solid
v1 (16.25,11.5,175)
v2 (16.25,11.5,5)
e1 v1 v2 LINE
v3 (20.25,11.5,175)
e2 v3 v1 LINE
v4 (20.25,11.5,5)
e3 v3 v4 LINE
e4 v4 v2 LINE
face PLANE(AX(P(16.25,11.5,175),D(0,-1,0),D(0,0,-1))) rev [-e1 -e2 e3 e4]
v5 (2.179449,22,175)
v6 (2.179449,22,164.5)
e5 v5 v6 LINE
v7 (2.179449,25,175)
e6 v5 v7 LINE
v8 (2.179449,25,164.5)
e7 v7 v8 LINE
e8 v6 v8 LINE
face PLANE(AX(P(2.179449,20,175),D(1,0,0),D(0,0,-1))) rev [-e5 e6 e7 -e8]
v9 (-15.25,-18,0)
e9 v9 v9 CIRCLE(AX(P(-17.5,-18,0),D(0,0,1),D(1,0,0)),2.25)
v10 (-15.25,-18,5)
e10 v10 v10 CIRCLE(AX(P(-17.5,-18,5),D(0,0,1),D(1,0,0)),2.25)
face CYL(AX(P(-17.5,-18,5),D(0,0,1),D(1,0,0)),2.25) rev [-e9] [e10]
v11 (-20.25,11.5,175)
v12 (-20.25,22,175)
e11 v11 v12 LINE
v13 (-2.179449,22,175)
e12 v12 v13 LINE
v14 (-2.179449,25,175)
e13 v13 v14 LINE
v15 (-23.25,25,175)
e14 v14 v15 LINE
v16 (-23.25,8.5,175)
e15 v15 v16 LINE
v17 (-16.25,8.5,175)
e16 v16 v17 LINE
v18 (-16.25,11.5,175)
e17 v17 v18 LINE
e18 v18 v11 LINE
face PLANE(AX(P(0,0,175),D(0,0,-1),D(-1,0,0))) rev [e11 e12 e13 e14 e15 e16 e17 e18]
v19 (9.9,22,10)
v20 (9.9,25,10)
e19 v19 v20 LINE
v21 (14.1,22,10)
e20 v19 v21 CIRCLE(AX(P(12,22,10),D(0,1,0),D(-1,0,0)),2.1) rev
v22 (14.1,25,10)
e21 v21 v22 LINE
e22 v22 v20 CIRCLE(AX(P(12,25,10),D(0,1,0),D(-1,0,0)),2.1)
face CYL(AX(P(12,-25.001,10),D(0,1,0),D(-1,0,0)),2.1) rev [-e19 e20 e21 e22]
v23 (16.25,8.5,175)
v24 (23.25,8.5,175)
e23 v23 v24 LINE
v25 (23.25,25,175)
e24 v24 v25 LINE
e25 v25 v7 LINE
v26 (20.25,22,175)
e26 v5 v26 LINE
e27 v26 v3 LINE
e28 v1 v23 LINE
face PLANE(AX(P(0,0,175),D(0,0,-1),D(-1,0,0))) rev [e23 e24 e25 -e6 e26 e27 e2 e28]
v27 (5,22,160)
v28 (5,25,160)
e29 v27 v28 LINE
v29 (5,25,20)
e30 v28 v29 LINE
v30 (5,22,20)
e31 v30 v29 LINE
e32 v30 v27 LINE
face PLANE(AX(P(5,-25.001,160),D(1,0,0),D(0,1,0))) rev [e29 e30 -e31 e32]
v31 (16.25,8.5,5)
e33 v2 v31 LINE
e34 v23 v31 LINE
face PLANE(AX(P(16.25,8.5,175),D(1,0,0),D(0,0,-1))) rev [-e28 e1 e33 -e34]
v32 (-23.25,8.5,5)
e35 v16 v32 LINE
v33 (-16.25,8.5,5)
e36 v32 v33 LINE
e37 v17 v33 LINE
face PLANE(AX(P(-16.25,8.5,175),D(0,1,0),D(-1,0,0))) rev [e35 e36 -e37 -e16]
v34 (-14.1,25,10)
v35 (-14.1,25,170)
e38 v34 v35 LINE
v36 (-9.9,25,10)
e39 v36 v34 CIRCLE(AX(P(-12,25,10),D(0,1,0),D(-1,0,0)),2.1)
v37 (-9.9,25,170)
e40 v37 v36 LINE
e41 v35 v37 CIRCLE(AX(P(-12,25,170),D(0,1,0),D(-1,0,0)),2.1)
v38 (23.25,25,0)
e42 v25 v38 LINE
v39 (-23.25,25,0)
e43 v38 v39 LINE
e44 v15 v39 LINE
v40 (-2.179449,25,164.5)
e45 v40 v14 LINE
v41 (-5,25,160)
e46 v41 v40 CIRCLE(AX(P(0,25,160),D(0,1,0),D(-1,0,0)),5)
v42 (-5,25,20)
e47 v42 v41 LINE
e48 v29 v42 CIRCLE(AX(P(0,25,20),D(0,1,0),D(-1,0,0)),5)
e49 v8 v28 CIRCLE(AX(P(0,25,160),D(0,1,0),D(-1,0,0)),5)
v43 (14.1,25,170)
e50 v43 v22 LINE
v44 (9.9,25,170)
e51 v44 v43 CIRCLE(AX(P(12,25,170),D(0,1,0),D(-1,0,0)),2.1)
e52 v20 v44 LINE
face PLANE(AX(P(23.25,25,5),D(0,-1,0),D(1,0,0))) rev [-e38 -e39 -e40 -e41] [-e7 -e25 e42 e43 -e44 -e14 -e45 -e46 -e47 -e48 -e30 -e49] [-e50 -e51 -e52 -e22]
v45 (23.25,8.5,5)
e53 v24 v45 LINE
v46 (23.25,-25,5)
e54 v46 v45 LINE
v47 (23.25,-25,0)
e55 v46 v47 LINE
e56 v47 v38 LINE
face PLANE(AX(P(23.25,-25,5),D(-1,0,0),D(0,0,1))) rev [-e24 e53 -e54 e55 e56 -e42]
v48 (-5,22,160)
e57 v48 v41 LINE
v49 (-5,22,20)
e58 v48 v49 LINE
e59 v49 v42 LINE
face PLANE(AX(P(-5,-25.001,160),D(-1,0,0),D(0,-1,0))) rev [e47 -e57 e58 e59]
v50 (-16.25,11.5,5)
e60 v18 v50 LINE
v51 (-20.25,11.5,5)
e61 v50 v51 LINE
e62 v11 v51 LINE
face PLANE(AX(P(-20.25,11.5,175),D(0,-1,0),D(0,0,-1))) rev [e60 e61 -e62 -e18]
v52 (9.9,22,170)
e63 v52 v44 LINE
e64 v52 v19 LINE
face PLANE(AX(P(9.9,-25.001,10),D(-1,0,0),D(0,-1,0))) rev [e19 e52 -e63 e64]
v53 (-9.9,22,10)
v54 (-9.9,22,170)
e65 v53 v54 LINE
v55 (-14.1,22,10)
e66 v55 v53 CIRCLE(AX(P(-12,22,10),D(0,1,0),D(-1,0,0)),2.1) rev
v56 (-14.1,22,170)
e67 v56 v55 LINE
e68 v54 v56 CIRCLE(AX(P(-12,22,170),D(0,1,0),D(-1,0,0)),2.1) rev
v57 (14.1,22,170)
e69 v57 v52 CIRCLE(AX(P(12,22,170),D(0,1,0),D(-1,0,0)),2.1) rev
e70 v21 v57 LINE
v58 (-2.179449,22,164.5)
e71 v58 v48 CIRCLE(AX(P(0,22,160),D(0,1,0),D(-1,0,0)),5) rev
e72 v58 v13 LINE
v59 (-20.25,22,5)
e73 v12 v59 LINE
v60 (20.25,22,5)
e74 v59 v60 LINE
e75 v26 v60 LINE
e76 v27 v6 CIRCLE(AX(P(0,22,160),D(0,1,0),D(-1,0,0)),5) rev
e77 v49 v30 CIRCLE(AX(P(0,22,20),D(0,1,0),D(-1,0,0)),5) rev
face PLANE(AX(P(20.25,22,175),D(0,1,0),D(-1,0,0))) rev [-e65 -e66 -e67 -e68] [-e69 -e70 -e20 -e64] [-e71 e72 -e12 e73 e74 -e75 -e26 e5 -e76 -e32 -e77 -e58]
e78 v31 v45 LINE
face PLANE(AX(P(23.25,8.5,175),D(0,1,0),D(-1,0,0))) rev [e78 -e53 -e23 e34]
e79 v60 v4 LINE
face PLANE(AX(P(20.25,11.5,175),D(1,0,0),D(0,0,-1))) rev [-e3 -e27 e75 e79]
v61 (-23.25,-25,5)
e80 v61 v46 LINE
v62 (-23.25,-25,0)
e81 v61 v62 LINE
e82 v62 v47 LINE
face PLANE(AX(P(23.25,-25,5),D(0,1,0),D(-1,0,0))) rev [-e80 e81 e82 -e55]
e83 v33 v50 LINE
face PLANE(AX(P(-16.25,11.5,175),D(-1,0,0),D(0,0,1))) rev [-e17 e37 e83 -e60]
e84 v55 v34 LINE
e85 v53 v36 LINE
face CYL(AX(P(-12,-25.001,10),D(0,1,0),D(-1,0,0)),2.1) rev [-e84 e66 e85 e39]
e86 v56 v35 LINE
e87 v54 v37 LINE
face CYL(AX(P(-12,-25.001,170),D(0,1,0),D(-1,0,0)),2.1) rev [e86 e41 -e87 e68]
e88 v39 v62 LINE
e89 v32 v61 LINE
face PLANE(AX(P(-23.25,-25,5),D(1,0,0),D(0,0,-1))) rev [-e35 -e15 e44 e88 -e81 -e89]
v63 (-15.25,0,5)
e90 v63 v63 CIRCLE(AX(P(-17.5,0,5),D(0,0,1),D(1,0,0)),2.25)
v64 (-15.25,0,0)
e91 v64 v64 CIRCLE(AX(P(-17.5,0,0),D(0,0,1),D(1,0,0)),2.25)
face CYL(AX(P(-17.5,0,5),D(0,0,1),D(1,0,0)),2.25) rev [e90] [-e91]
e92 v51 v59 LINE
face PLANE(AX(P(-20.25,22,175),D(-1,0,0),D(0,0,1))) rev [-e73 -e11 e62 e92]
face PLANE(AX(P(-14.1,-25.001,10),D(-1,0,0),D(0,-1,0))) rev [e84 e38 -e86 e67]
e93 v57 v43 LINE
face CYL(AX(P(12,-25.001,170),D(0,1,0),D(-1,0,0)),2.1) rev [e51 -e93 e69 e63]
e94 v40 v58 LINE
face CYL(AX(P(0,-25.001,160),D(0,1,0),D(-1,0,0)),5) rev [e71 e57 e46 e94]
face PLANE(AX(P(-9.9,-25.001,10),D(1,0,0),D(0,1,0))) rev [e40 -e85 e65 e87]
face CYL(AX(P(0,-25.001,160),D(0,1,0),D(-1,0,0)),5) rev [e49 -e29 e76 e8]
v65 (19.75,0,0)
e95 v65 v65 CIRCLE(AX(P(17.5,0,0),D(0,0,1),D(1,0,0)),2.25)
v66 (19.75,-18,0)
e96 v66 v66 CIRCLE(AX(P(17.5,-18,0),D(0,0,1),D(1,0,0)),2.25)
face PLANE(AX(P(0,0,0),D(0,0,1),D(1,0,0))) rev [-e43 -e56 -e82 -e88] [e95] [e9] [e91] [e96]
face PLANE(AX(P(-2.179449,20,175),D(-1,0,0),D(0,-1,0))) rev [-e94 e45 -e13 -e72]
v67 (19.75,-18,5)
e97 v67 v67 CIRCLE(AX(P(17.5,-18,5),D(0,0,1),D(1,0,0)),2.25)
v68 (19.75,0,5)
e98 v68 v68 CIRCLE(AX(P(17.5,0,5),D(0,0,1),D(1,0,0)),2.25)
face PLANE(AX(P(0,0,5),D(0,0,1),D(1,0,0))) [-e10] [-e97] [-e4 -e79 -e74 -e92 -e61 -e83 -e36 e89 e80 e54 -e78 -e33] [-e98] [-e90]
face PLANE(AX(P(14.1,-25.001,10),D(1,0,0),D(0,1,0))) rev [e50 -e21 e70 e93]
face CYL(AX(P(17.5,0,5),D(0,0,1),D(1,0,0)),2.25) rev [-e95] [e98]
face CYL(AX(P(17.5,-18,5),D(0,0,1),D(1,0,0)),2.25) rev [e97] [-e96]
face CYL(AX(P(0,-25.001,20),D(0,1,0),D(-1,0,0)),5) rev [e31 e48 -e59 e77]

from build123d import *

# Parameters (mm, degrees)
ESQUISSE1_W              = 46.5
ESQUISSE1_H              = 50
BOSS_EXTRU_1_DEPTH       = 5
BOSS_EXTRU_2_DEPTH       = 170
D_GAGEMENT_M41_OUTLINE_R = 2.25
D_GAGEMENT_M41_DEPTH     = 5
ENL_V_MAT_EXTRU_3_REACH  = 185.482
ESQUISSE8_W              = 4.358898944
ESQUISSE8_H              = 10.5
ENL_V_MAT_EXTRU_4_DEPTH  = 5


# Read off the part's stored shape, not the designer's step: Dégagement M41
with BuildPart() as part:
    # Esquisse1 → Boss.-Extru.1 (new body)
    with BuildSketch(Plane.XY):
        Rectangle(ESQUISSE1_W, ESQUISSE1_H)
    extrude(amount=BOSS_EXTRU_1_DEPTH)

    # Esquisse2 → Boss.-Extru.2 (add)
    with BuildSketch(Plane.XY.offset(5)):
        Polygon((-23.25, 25), (23.25, 25), (23.25, 8.5), (16.25, 8.5), (16.25, 11.5), (20.25, 11.5), (20.25, 22), (-20.25, 22), (-20.25, 11.5), (-16.25, 11.5), (-16.25, 8.5), (-23.25, 8.5), align=None)
    extrude(amount=BOSS_EXTRU_2_DEPTH)

    # Dégagement M41 outline → Dégagement M41 (cut)
    with BuildSketch(Plane.XY):
        with Locations((17.5, -18)):
            Circle(D_GAGEMENT_M41_OUTLINE_R)
        with Locations((-17.5, 0)):
            Circle(D_GAGEMENT_M41_OUTLINE_R)
        with Locations((17.5, 0)):
            Circle(D_GAGEMENT_M41_OUTLINE_R)
        with Locations((-17.5, -18)):
            Circle(D_GAGEMENT_M41_OUTLINE_R)
    extrude(amount=D_GAGEMENT_M41_DEPTH, mode=Mode.SUBTRACT)

    # Esquisse5 → Enlèv. mat.-Extru.3 (cut, up to next)
    with BuildSketch(Plane(origin=(0, 25, 0), x_dir=(1, 0, 0), z_dir=(0, 1, 0)), mode=Mode.PRIVATE) as enl_v_mat_extru_3_sk1:
        with BuildLine():
            Line((14.1, -10), (14.1, -170))
            ThreePointArc((14.1, -170), (12, -172.1), (9.9, -170))
            Line((9.9, -170), (9.9, -10))
            ThreePointArc((9.9, -10), (12, -7.9), (14.1, -10))
        make_face()
    enl_v_mat_extru_3_tool1 = extrude(enl_v_mat_extru_3_sk1.sketch, amount=-ENL_V_MAT_EXTRU_3_REACH, mode=Mode.PRIVATE) & part.part
    # Esquisse5 → Enlèv. mat.-Extru.3 (cut, up to next)
    with BuildSketch(Plane(origin=(0, 25, 0), x_dir=(1, 0, 0), z_dir=(0, 1, 0)), mode=Mode.PRIVATE) as enl_v_mat_extru_3_sk2:
        with BuildLine():
            Line((-9.9, -10), (-9.9, -170))
            ThreePointArc((-9.9, -170), (-12, -172.1), (-14.1, -170))
            Line((-14.1, -170), (-14.1, -10))
            ThreePointArc((-14.1, -10), (-12, -7.9), (-9.9, -10))
        make_face()
    enl_v_mat_extru_3_tool2 = extrude(enl_v_mat_extru_3_sk2.sketch, amount=-ENL_V_MAT_EXTRU_3_REACH, mode=Mode.PRIVATE) & part.part
    # Esquisse5 → Enlèv. mat.-Extru.3 (cut, up to next)
    with BuildSketch(Plane(origin=(0, 25, 0), x_dir=(1, 0, 0), z_dir=(0, 1, 0)), mode=Mode.PRIVATE) as enl_v_mat_extru_3_sk3:
        with BuildLine():
            Line((-5, -160), (-5, -20))
            ThreePointArc((-5, -20), (0, -15), (5, -20))
            Line((5, -20), (5, -160))
            ThreePointArc((5, -160), (0, -165), (-5, -160))
        make_face()
    enl_v_mat_extru_3_tool3 = extrude(enl_v_mat_extru_3_sk3.sketch, amount=-ENL_V_MAT_EXTRU_3_REACH, mode=Mode.PRIVATE) & part.part
    add(enl_v_mat_extru_3_tool1.solids().sort_by_distance((12, 25, 90))[0], mode=Mode.SUBTRACT)
    add(enl_v_mat_extru_3_tool2.solids().sort_by_distance((-12, 25, 90))[0], mode=Mode.SUBTRACT)
    add(enl_v_mat_extru_3_tool3.solids().sort_by_distance((0, 25, 90))[0], mode=Mode.SUBTRACT)

    # Esquisse8 → Enlèv. mat.-Extru.4 (cut)
    with BuildSketch(Plane(origin=(0, 25, 0), x_dir=(1, 0, 0), z_dir=(0, 1, 0))):
        with Locations((0, -169.75)):
            Rectangle(ESQUISSE8_W, ESQUISSE8_H)
    extrude(amount=-ENL_V_MAT_EXTRU_4_DEPTH, mode=Mode.SUBTRACT)


solid = part.part
